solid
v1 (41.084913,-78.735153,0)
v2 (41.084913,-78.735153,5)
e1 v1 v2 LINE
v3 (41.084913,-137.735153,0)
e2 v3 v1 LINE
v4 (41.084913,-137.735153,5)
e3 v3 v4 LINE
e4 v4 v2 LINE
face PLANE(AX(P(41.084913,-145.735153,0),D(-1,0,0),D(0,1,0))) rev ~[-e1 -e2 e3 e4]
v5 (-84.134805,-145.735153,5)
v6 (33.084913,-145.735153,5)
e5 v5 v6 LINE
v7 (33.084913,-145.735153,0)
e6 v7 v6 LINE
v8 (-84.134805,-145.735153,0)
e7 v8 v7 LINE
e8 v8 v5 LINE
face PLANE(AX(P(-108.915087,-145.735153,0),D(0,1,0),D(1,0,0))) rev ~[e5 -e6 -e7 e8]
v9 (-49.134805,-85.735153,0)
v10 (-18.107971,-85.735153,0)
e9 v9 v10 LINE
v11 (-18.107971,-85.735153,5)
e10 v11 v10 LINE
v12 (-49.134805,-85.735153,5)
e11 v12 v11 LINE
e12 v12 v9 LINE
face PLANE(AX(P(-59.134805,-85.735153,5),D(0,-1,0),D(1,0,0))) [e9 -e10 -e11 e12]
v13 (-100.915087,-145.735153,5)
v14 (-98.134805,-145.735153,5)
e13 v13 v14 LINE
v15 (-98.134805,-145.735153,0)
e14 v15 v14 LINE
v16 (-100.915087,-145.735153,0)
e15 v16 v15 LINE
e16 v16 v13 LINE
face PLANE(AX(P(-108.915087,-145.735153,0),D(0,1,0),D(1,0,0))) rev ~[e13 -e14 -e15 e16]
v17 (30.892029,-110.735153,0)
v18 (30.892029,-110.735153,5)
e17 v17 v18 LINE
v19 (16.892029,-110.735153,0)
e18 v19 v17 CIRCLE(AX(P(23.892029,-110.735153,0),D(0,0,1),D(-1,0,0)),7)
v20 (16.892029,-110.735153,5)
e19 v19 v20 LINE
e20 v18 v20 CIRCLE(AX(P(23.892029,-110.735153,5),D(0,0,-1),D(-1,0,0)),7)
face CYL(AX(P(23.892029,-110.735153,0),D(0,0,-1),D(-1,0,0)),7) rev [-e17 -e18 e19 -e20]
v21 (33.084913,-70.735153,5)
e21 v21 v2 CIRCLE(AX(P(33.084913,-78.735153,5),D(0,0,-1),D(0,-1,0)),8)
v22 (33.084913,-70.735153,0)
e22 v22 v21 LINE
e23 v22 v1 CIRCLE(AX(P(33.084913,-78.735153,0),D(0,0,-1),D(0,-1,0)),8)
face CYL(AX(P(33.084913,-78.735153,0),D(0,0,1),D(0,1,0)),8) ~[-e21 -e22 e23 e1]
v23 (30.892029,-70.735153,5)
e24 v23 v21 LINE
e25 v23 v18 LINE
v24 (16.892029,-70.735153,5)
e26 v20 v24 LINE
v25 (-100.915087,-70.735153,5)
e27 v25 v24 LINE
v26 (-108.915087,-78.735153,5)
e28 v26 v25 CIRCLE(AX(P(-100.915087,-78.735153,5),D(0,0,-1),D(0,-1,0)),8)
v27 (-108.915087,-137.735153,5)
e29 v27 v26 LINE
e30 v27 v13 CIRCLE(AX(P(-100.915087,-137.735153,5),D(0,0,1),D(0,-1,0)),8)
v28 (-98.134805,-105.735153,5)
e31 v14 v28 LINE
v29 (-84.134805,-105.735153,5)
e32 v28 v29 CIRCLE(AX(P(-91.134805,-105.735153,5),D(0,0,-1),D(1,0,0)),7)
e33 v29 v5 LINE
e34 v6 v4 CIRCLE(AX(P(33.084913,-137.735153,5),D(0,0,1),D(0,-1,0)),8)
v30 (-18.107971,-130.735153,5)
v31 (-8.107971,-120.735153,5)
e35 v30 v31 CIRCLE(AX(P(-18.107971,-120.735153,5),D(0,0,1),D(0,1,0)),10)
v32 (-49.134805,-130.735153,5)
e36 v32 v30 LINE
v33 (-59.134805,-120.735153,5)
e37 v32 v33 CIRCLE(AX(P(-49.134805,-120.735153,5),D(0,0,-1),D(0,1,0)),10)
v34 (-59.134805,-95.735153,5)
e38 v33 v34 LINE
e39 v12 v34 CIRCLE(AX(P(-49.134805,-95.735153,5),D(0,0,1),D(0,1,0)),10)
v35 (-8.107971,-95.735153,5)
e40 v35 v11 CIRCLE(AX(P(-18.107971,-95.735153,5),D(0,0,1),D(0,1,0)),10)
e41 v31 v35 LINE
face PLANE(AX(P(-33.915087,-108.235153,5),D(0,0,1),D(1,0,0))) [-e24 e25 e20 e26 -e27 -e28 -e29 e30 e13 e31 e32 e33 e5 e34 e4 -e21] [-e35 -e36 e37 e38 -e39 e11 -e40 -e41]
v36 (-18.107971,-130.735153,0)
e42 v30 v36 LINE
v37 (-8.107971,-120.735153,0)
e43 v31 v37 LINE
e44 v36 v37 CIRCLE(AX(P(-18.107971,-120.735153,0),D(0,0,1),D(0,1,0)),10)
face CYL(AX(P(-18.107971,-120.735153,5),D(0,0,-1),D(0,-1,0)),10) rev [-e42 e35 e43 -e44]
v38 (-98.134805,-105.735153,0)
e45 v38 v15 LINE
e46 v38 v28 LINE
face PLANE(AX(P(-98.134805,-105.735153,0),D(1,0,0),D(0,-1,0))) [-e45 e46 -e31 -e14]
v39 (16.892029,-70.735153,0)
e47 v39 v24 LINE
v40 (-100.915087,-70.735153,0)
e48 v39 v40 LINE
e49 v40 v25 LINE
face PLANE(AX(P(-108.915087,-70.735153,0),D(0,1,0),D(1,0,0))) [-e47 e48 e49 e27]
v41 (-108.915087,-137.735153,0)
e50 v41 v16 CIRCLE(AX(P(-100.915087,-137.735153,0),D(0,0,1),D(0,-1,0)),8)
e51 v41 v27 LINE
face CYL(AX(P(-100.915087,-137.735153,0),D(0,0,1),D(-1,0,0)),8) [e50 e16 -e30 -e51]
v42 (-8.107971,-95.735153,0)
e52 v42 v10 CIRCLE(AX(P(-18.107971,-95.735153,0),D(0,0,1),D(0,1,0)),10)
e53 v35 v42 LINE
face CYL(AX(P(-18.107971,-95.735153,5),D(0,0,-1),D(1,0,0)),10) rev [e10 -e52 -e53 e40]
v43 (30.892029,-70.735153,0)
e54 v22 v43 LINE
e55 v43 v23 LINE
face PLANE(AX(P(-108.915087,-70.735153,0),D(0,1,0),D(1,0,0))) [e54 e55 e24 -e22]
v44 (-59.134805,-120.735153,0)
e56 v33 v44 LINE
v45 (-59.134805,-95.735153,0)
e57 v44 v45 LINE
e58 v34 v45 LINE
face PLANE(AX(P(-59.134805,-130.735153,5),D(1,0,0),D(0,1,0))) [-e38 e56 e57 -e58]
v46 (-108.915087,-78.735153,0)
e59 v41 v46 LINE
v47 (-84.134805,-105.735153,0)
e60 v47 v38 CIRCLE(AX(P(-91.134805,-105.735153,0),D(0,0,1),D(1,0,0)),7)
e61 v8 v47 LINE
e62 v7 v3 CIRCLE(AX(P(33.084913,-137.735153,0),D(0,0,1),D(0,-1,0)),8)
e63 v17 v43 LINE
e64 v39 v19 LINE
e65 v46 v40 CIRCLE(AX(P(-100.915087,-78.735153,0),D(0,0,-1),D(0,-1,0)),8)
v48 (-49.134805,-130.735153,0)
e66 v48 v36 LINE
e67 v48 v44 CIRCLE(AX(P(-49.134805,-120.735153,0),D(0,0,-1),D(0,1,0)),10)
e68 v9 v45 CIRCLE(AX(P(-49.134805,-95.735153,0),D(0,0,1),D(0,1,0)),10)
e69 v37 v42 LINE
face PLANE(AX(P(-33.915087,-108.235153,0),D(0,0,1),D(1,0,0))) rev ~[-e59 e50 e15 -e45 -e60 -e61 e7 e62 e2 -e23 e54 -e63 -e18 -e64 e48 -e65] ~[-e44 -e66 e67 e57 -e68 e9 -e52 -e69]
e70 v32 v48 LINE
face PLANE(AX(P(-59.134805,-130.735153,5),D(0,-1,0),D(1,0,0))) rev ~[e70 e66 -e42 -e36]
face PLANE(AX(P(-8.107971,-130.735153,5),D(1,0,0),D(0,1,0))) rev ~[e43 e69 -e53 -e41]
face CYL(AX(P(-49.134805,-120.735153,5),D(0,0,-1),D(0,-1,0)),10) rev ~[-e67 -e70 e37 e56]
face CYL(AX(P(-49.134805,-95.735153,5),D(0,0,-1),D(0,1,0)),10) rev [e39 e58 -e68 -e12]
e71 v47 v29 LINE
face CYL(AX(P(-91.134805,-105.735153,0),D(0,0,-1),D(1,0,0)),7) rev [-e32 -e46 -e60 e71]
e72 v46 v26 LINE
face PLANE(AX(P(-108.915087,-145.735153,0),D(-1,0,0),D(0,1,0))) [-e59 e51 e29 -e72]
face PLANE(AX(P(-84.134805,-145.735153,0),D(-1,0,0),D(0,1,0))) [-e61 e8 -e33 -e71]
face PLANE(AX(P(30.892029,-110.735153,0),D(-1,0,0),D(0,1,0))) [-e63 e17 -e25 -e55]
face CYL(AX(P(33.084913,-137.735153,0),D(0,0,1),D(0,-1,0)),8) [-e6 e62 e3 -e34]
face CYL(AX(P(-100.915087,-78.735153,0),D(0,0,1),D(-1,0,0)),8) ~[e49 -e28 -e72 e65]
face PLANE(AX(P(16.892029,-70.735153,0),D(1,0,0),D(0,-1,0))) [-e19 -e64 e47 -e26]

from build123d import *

# Parameters (mm, degrees)
F0_W     = 150
F0_H     = 75
F1_DEPTH = 5
F3_DEPTH = 282
F4_DEPTH = 5.001
F5_W     = 51.0268339871
F5_H     = 45
F6_DEPTH = 5.001
F7_R     = 10
F8_R     = 8


# Not quite as in the source:
# - an extrude ends at something that could not be found from the text; its depth is read off the source's solid


with BuildPart() as f1:
    # F0 (on Top) → F1 (new body)
    with BuildSketch(Plane.XY):
        with Locations((-33.9150866494, -108.2351529738)):
            Rectangle(F0_W, F0_H)
    extrude(amount=F1_DEPTH)

    # F2 (on Top) → F3 (cut, through all)
    with BuildSketch(Plane.XY):
        with BuildLine():
            Line((-98.1348048404, -105.7351529738), (-98.1348048404, -145.7351529738))
            Line((-98.1348048404, -145.7351529738), (-84.1348048404, -145.7351529738))
            Line((-84.1348048404, -145.7351529738), (-84.1348048404, -105.7351529738))
            ThreePointArc((-84.1348048404, -105.7351529738), (-91.1348048404, -98.7351529738), (-98.1348048404, -105.7351529738))
        make_face()
        with BuildLine():
            Line((30.8920291467, -110.7351529738), (30.8920291467, -70.7351529738))
            Line((30.8920291467, -70.7351529738), (16.8920291467, -70.7351529738))
            Line((16.8920291467, -70.7351529738), (16.8920291467, -110.7351529738))
            ThreePointArc((16.8920291467, -110.7351529738), (23.8920291467, -117.7351529738), (30.8920291467, -110.7351529738))
        make_face()
    extrude(amount=-F3_DEPTH, mode=Mode.SUBTRACT)

    # F2 (on Top) → F4 (cut, through all)
    with BuildSketch(Plane.XY):
        with BuildLine():
            Line((-98.1348048404, -105.7351529738), (-98.1348048404, -145.7351529738))
            Line((-98.1348048404, -145.7351529738), (-84.1348048404, -145.7351529738))
            Line((-84.1348048404, -145.7351529738), (-84.1348048404, -105.7351529738))
            ThreePointArc((-84.1348048404, -105.7351529738), (-91.1348048404, -98.7351529738), (-98.1348048404, -105.7351529738))
        make_face()
        with BuildLine():
            Line((30.8920291467, -110.7351529738), (30.8920291467, -70.7351529738))
            Line((30.8920291467, -70.7351529738), (16.8920291467, -70.7351529738))
            Line((16.8920291467, -70.7351529738), (16.8920291467, -110.7351529738))
            ThreePointArc((16.8920291467, -110.7351529738), (23.8920291467, -117.7351529738), (30.8920291467, -110.7351529738))
        make_face()
    extrude(amount=F4_DEPTH, mode=Mode.SUBTRACT)

    # F5 (on face) → F6 (cut, through all)
    with BuildSketch(Plane.XY.offset(5)):
        with Locations((-33.6213878469, -108.2351529738)):
            Rectangle(F5_W, F5_H)
    extrude(amount=-F6_DEPTH, mode=Mode.SUBTRACT)

    # F7
    f7_edges = [f1.edges().sort_by_distance(p)[0] for p in [
        (-8.107971, -85.735153, 2.5),
        (-8.107971, -130.735153, 2.5),
        (-59.134805, -130.735153, 2.5),
        (-59.134805, -85.735153, 2.5),
    ]]
    fillet(f7_edges, radius=F7_R)

    # F8
    f8_edges = [f1.edges().sort_by_distance(p)[0] for p in [
        (41.084913, -145.735153, 2.5),
        (41.084913, -70.735153, 2.5),
        (-108.915087, -70.735153, 2.5),
        (-108.915087, -145.735153, 2.5),
    ]]
    fillet(f8_edges, radius=F8_R)


solid = f1.part
